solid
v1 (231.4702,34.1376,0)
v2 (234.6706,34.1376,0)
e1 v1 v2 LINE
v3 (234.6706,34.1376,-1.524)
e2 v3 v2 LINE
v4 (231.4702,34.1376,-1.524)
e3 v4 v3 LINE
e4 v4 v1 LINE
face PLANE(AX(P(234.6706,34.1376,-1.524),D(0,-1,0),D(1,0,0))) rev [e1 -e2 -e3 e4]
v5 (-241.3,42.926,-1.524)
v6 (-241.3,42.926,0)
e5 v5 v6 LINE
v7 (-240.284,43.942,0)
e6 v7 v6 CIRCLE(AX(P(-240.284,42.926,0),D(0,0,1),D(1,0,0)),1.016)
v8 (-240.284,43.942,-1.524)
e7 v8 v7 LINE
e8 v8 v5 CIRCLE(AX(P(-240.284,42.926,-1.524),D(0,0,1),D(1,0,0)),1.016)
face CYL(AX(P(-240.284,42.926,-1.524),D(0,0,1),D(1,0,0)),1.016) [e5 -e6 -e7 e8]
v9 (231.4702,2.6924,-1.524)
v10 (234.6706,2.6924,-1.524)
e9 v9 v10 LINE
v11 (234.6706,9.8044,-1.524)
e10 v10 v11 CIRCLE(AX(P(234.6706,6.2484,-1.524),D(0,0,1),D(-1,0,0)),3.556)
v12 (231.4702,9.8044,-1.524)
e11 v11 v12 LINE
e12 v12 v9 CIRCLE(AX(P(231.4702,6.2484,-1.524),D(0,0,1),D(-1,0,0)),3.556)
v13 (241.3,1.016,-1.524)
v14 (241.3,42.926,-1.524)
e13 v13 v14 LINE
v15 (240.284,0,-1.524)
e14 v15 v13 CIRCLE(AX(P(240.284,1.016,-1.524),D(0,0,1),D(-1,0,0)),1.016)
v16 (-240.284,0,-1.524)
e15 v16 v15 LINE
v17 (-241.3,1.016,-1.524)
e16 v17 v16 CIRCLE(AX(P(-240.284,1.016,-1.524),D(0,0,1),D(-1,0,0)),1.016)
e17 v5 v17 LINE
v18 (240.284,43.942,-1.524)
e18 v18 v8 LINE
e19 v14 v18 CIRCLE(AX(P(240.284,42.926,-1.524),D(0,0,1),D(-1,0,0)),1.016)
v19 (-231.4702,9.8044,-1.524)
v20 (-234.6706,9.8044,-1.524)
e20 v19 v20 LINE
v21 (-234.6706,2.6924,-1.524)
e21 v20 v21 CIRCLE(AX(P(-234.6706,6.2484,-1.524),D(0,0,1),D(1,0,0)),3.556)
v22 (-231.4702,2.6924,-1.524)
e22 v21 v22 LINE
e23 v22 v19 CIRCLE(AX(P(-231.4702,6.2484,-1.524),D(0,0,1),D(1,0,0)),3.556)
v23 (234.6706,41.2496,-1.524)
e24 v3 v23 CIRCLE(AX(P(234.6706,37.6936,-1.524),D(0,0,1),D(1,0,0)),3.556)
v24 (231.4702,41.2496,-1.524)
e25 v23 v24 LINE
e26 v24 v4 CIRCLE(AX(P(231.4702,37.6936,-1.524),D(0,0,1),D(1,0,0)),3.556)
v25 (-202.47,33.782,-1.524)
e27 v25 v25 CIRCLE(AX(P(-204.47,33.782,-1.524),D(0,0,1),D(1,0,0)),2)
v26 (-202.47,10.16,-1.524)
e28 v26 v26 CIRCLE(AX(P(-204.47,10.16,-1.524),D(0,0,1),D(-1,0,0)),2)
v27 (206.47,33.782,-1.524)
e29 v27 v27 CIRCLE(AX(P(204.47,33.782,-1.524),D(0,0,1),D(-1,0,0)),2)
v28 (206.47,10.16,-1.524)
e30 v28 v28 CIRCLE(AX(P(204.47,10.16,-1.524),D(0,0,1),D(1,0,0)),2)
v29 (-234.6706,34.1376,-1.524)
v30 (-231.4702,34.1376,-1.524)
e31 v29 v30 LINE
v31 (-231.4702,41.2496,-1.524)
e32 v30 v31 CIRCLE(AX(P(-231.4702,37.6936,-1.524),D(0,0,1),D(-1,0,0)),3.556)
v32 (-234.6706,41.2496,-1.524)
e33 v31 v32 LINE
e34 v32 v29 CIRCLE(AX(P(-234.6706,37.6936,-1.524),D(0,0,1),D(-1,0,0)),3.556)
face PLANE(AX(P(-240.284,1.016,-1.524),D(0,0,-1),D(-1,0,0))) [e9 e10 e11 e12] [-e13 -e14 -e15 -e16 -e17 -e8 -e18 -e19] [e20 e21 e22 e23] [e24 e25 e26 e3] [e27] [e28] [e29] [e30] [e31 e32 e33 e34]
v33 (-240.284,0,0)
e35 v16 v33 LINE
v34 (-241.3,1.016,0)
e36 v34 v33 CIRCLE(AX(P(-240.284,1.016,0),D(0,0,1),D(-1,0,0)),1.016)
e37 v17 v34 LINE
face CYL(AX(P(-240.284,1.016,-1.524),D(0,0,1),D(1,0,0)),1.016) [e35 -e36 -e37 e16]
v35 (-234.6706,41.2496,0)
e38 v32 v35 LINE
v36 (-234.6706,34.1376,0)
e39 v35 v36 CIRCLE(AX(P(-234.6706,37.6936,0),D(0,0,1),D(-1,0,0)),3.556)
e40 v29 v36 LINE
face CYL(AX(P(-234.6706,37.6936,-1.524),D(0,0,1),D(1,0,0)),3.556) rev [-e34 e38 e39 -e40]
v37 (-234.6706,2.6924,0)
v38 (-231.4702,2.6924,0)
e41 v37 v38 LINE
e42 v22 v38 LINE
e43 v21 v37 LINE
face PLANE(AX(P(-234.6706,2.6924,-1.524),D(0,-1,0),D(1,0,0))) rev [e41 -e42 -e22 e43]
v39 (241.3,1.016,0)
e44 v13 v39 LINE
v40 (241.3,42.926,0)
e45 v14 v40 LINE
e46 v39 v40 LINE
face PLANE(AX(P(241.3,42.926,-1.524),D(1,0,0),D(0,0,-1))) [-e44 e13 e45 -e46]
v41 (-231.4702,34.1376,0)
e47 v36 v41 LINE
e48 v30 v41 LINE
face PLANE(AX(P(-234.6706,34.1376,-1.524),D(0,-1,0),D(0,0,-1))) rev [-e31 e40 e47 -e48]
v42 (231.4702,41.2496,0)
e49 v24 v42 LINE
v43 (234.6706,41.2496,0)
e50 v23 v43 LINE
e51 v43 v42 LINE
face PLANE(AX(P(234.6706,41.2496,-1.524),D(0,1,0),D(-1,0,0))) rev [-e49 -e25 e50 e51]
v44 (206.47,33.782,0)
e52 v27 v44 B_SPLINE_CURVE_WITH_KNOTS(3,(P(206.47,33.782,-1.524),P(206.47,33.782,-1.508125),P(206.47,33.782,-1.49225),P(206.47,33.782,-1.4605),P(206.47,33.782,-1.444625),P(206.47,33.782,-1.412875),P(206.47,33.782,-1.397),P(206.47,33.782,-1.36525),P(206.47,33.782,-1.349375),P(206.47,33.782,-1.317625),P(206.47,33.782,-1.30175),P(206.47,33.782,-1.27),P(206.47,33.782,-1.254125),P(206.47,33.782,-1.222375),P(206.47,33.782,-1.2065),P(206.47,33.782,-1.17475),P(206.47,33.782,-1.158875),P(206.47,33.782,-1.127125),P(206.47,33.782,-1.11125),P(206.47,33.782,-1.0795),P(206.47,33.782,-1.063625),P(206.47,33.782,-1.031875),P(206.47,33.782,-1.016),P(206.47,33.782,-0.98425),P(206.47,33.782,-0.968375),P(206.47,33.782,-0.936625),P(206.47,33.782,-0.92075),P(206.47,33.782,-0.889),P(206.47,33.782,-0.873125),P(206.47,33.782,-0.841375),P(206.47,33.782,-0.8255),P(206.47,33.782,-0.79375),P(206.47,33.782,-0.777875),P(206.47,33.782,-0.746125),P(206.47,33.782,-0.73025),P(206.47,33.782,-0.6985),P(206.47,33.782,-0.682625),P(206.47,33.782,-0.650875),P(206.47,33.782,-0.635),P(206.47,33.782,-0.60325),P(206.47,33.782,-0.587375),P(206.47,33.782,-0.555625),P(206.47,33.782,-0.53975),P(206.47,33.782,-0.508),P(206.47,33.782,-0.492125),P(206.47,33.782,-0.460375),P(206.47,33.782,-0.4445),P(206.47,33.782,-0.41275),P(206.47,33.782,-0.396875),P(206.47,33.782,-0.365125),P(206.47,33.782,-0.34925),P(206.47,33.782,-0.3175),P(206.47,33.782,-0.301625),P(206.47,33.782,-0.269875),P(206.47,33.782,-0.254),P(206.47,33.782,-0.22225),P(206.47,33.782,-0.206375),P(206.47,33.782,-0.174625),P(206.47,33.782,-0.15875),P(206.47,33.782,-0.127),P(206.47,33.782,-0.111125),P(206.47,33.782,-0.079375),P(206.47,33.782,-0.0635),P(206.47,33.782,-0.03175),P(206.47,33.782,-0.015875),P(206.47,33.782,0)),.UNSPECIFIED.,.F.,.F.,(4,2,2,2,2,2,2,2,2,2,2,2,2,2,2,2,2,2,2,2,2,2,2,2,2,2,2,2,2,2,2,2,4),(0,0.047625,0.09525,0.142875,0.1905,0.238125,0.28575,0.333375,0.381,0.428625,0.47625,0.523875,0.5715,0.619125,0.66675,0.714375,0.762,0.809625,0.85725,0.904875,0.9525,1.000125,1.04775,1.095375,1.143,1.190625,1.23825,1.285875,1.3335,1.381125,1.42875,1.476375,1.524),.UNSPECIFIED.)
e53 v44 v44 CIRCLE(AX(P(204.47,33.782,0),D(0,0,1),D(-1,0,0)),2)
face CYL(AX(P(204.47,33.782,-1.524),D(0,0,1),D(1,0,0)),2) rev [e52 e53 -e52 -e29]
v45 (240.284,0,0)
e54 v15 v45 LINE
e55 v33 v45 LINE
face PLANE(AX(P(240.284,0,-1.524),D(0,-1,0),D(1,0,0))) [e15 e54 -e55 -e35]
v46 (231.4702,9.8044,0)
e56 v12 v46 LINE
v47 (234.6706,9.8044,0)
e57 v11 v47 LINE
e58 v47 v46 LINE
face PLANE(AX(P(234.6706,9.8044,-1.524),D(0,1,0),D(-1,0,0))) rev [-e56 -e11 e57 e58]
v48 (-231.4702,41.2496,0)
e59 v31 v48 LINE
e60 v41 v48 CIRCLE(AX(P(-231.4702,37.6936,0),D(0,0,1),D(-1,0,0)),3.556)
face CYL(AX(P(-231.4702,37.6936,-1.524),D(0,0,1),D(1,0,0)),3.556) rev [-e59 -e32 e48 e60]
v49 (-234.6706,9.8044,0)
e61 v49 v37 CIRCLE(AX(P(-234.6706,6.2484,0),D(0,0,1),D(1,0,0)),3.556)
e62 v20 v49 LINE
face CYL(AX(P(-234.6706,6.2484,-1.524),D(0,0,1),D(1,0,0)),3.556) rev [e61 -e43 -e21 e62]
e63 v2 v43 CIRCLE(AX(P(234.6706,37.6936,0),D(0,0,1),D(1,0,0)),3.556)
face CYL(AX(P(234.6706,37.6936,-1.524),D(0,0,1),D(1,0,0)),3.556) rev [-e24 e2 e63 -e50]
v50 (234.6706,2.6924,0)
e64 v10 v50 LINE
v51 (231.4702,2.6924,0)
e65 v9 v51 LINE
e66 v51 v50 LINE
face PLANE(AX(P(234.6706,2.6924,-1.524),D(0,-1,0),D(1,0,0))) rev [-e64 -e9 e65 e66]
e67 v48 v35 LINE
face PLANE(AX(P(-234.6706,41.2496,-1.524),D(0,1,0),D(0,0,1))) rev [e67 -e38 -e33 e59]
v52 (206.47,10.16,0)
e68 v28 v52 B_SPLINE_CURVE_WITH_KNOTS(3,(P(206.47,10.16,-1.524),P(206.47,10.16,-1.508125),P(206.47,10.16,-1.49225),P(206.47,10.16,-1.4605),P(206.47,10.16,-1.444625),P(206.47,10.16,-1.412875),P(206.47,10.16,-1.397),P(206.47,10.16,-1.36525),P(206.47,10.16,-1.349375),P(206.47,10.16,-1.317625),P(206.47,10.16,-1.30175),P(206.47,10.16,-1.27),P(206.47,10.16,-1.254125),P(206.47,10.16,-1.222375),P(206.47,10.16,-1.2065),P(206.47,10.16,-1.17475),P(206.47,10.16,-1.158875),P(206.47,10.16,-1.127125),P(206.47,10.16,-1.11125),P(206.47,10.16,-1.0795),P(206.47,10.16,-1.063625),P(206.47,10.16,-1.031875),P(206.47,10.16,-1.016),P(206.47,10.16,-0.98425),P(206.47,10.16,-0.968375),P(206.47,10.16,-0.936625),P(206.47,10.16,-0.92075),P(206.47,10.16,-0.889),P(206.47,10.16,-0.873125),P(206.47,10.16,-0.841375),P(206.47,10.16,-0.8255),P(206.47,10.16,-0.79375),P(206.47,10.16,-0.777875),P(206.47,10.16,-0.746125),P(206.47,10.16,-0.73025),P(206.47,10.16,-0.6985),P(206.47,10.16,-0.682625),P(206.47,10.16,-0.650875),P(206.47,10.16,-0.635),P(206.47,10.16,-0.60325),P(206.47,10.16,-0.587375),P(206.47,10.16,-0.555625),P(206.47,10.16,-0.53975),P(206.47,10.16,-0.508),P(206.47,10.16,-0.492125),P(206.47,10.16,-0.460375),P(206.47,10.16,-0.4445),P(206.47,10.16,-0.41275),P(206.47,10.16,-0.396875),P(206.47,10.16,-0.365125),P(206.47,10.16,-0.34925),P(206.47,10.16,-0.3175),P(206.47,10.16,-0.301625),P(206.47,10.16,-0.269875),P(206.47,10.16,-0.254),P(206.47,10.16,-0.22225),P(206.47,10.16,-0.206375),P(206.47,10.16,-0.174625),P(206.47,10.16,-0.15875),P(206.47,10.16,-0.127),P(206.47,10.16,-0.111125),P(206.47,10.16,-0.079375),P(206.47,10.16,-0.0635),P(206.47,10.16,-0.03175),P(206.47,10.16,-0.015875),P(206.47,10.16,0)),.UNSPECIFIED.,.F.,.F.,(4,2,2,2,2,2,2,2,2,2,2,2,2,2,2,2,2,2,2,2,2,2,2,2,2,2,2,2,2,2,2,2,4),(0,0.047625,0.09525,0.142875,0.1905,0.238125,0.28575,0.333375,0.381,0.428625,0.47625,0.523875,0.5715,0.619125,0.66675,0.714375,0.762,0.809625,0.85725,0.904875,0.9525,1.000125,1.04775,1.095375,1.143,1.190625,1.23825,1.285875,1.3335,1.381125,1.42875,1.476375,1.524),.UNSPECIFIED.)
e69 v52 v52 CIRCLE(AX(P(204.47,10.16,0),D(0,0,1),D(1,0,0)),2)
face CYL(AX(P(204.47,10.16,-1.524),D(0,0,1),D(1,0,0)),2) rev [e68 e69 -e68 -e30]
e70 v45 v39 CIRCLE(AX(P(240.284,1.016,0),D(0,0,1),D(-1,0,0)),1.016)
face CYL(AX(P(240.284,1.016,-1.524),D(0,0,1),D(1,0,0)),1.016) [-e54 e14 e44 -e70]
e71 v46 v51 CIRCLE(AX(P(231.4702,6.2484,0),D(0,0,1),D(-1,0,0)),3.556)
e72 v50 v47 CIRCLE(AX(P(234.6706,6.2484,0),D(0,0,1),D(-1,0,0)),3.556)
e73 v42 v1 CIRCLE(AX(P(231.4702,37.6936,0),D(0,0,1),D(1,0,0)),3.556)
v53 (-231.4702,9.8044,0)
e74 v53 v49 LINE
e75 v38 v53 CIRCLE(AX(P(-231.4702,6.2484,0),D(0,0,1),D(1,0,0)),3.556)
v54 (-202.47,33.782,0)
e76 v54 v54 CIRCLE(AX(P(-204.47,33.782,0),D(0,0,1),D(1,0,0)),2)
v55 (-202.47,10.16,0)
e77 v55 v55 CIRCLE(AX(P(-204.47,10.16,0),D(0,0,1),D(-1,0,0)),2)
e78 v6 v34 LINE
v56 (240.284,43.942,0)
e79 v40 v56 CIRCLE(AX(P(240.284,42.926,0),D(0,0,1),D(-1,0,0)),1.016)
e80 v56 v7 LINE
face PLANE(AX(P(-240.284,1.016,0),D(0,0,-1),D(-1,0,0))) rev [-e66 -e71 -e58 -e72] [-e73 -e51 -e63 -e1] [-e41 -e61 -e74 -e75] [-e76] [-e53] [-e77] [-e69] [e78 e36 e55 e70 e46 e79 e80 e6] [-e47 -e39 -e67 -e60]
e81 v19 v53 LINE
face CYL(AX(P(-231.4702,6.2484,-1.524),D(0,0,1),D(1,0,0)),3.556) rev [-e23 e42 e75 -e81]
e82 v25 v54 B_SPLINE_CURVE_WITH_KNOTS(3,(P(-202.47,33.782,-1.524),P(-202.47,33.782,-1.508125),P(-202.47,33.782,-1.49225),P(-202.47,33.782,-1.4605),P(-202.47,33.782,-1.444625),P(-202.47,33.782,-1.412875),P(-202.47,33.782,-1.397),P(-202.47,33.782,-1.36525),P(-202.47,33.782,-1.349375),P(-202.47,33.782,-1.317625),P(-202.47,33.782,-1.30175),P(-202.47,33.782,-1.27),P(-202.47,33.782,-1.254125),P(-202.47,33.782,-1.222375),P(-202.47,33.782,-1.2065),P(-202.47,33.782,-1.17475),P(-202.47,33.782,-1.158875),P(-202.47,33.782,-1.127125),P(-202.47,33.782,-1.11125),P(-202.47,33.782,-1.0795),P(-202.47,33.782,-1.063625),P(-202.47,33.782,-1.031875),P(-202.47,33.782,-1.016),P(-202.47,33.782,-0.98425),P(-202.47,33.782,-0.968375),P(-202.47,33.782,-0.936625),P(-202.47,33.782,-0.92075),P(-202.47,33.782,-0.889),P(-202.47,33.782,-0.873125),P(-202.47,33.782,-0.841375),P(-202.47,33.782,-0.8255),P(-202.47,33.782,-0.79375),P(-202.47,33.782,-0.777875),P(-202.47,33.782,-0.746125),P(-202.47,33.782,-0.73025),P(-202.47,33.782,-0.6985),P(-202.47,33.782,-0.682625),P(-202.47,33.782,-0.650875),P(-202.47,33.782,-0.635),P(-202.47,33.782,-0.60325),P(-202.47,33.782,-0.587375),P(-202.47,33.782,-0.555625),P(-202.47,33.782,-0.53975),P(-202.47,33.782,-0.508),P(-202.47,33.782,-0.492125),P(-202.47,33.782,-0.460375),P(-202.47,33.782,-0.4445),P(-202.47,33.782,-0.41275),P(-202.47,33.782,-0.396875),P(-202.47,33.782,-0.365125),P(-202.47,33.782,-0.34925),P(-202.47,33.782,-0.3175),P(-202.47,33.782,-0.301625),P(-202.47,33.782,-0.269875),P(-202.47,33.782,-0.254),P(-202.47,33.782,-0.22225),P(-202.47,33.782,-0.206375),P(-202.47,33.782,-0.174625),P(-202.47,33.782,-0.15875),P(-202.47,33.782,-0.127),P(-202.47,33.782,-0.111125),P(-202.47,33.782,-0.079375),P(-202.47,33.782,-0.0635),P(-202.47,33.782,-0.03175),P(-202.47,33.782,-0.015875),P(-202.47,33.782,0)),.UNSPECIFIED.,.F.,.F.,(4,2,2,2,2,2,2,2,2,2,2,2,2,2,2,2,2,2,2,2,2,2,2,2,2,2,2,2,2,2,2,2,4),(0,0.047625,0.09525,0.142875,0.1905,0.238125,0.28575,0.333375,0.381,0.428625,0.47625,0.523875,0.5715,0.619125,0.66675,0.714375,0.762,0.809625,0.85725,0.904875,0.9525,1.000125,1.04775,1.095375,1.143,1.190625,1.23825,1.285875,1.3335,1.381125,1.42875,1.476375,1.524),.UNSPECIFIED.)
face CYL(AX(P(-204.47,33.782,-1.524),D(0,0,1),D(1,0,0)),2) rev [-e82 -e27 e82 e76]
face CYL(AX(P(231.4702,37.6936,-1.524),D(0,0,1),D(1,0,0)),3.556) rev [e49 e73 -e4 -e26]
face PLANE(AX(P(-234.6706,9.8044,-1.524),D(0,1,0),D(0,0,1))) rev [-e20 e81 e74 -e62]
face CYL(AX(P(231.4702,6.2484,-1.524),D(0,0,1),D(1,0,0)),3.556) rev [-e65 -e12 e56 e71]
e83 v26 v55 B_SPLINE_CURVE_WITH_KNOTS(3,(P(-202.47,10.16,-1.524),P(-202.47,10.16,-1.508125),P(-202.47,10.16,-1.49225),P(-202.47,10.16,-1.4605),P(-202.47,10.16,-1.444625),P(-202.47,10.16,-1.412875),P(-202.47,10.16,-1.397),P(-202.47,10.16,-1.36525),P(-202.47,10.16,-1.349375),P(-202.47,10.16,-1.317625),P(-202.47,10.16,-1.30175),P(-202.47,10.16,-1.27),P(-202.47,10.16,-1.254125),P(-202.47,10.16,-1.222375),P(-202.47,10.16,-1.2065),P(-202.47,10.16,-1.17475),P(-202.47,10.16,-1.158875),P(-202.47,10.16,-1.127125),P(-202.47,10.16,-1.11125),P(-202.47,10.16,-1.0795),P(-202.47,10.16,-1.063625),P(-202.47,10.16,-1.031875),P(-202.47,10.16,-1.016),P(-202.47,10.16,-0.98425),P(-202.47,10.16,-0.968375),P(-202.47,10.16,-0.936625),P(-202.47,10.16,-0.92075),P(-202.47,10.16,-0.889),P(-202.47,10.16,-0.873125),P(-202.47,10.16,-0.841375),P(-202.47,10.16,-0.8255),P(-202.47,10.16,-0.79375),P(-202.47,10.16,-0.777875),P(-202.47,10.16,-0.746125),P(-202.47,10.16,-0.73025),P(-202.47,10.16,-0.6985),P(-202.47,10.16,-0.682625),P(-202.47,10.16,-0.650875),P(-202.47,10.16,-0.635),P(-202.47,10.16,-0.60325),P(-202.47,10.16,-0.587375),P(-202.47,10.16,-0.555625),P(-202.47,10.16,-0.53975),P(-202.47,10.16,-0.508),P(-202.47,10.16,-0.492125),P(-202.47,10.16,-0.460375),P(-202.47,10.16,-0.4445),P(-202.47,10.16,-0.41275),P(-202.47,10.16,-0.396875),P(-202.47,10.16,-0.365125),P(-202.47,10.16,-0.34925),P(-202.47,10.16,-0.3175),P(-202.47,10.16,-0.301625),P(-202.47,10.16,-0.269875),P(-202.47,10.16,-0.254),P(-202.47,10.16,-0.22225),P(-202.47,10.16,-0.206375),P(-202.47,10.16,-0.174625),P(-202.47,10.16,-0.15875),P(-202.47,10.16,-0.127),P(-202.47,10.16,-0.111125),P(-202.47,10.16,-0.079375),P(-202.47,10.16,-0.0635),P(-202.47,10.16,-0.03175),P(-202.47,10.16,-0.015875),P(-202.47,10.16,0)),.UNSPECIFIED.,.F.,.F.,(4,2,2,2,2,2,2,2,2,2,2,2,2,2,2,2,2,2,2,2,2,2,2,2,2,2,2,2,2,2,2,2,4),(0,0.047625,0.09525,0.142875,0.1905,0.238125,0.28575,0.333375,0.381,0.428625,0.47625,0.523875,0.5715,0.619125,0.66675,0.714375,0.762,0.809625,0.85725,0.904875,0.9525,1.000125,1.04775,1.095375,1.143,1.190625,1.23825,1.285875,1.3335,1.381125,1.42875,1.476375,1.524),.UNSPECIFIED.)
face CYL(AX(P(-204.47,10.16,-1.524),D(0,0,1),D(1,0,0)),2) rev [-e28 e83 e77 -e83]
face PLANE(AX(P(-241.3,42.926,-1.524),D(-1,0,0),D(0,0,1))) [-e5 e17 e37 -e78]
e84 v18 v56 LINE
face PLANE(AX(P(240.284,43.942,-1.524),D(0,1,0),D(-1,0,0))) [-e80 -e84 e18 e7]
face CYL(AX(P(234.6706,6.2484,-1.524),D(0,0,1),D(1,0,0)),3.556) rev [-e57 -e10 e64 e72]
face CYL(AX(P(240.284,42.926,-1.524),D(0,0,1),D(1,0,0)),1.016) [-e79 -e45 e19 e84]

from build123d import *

# Parameters (mm, degrees)
BASE_FLANGE1_DEPTH         = 1.524
CUT_EXTRUDE_MOUNTING_DEPTH = 246.27313742
SKETCH5_R                  = 2
CUT_EXTRUDE_COVER_DEPTH    = 2.54


# Sheet-metal steps are written as plain solids
with BuildPart() as part:
    # Sketch1 → Base-Flange1 (new body)
    with BuildSketch(Plane.XY):
        with BuildLine():
            Line((241.3, 42.926), (241.3, 1.016))
            ThreePointArc((241.3, 1.016), (241.00242049, 0.29757951), (240.284, 0))
            Line((240.284, 0), (-240.284, 0))
            ThreePointArc((-240.284, 0), (-241.00242049, 0.29757951), (-241.3, 1.016))
            Line((-241.3, 1.016), (-241.3, 42.926))
            ThreePointArc((-241.3, 42.926), (-241.00242049, 43.64442049), (-240.284, 43.942))
            Line((-240.284, 43.942), (240.284, 43.942))
            ThreePointArc((240.284, 43.942), (241.00242049, 43.64442049), (241.3, 42.926))
        make_face()
    extrude(amount=-BASE_FLANGE1_DEPTH)

    # Sketch2 → Cut-Extrude-Mounting (cut, through all)
    with BuildSketch(Plane.XY):
        with BuildLine():
            Line((-234.6706, 9.8044), (-231.4702, 9.8044))
            ThreePointArc((-231.4702, 9.8044), (-227.9142, 6.2484), (-231.4702, 2.6924))
            Line((-231.4702, 2.6924), (-234.6706, 2.6924))
            ThreePointArc((-234.6706, 2.6924), (-238.2266, 6.2484), (-234.6706, 9.8044))
        make_face()
        with BuildLine():
            Line((-234.6706, 34.1376), (-231.4702, 34.1376))
            ThreePointArc((-231.4702, 34.1376), (-227.9142, 37.6936), (-231.4702, 41.2496))
            Line((-231.4702, 41.2496), (-234.6706, 41.2496))
            ThreePointArc((-234.6706, 41.2496), (-238.2266, 37.6936), (-234.6706, 34.1376))
        make_face()
        with BuildLine():
            Line((234.6706, 9.8044), (231.4702, 9.8044))
            ThreePointArc((231.4702, 9.8044), (227.9142, 6.2484), (231.4702, 2.6924))
            Line((231.4702, 2.6924), (234.6706, 2.6924))
            ThreePointArc((234.6706, 2.6924), (238.2266, 6.2484), (234.6706, 9.8044))
        make_face()
        with BuildLine():
            Line((234.6706, 34.1376), (231.4702, 34.1376))
            ThreePointArc((231.4702, 34.1376), (227.9142, 37.6936), (231.4702, 41.2496))
            Line((231.4702, 41.2496), (234.6706, 41.2496))
            ThreePointArc((234.6706, 41.2496), (238.2266, 37.6936), (234.6706, 34.1376))
        make_face()
    extrude(amount=-CUT_EXTRUDE_MOUNTING_DEPTH, mode=Mode.SUBTRACT)

    # Sketch5 → Cut-Extrude-Cover (cut)
    with BuildSketch(Plane.XY):
        with Locations((-204.47, 33.782)):
            Circle(SKETCH5_R)
        with Locations((-204.47, 10.16)):
            Circle(SKETCH5_R)
        with Locations((204.47, 10.16)):
            Circle(SKETCH5_R)
        with Locations((204.47, 33.782)):
            Circle(SKETCH5_R)
    extrude(amount=-CUT_EXTRUDE_COVER_DEPTH, mode=Mode.SUBTRACT)


solid = part.part
